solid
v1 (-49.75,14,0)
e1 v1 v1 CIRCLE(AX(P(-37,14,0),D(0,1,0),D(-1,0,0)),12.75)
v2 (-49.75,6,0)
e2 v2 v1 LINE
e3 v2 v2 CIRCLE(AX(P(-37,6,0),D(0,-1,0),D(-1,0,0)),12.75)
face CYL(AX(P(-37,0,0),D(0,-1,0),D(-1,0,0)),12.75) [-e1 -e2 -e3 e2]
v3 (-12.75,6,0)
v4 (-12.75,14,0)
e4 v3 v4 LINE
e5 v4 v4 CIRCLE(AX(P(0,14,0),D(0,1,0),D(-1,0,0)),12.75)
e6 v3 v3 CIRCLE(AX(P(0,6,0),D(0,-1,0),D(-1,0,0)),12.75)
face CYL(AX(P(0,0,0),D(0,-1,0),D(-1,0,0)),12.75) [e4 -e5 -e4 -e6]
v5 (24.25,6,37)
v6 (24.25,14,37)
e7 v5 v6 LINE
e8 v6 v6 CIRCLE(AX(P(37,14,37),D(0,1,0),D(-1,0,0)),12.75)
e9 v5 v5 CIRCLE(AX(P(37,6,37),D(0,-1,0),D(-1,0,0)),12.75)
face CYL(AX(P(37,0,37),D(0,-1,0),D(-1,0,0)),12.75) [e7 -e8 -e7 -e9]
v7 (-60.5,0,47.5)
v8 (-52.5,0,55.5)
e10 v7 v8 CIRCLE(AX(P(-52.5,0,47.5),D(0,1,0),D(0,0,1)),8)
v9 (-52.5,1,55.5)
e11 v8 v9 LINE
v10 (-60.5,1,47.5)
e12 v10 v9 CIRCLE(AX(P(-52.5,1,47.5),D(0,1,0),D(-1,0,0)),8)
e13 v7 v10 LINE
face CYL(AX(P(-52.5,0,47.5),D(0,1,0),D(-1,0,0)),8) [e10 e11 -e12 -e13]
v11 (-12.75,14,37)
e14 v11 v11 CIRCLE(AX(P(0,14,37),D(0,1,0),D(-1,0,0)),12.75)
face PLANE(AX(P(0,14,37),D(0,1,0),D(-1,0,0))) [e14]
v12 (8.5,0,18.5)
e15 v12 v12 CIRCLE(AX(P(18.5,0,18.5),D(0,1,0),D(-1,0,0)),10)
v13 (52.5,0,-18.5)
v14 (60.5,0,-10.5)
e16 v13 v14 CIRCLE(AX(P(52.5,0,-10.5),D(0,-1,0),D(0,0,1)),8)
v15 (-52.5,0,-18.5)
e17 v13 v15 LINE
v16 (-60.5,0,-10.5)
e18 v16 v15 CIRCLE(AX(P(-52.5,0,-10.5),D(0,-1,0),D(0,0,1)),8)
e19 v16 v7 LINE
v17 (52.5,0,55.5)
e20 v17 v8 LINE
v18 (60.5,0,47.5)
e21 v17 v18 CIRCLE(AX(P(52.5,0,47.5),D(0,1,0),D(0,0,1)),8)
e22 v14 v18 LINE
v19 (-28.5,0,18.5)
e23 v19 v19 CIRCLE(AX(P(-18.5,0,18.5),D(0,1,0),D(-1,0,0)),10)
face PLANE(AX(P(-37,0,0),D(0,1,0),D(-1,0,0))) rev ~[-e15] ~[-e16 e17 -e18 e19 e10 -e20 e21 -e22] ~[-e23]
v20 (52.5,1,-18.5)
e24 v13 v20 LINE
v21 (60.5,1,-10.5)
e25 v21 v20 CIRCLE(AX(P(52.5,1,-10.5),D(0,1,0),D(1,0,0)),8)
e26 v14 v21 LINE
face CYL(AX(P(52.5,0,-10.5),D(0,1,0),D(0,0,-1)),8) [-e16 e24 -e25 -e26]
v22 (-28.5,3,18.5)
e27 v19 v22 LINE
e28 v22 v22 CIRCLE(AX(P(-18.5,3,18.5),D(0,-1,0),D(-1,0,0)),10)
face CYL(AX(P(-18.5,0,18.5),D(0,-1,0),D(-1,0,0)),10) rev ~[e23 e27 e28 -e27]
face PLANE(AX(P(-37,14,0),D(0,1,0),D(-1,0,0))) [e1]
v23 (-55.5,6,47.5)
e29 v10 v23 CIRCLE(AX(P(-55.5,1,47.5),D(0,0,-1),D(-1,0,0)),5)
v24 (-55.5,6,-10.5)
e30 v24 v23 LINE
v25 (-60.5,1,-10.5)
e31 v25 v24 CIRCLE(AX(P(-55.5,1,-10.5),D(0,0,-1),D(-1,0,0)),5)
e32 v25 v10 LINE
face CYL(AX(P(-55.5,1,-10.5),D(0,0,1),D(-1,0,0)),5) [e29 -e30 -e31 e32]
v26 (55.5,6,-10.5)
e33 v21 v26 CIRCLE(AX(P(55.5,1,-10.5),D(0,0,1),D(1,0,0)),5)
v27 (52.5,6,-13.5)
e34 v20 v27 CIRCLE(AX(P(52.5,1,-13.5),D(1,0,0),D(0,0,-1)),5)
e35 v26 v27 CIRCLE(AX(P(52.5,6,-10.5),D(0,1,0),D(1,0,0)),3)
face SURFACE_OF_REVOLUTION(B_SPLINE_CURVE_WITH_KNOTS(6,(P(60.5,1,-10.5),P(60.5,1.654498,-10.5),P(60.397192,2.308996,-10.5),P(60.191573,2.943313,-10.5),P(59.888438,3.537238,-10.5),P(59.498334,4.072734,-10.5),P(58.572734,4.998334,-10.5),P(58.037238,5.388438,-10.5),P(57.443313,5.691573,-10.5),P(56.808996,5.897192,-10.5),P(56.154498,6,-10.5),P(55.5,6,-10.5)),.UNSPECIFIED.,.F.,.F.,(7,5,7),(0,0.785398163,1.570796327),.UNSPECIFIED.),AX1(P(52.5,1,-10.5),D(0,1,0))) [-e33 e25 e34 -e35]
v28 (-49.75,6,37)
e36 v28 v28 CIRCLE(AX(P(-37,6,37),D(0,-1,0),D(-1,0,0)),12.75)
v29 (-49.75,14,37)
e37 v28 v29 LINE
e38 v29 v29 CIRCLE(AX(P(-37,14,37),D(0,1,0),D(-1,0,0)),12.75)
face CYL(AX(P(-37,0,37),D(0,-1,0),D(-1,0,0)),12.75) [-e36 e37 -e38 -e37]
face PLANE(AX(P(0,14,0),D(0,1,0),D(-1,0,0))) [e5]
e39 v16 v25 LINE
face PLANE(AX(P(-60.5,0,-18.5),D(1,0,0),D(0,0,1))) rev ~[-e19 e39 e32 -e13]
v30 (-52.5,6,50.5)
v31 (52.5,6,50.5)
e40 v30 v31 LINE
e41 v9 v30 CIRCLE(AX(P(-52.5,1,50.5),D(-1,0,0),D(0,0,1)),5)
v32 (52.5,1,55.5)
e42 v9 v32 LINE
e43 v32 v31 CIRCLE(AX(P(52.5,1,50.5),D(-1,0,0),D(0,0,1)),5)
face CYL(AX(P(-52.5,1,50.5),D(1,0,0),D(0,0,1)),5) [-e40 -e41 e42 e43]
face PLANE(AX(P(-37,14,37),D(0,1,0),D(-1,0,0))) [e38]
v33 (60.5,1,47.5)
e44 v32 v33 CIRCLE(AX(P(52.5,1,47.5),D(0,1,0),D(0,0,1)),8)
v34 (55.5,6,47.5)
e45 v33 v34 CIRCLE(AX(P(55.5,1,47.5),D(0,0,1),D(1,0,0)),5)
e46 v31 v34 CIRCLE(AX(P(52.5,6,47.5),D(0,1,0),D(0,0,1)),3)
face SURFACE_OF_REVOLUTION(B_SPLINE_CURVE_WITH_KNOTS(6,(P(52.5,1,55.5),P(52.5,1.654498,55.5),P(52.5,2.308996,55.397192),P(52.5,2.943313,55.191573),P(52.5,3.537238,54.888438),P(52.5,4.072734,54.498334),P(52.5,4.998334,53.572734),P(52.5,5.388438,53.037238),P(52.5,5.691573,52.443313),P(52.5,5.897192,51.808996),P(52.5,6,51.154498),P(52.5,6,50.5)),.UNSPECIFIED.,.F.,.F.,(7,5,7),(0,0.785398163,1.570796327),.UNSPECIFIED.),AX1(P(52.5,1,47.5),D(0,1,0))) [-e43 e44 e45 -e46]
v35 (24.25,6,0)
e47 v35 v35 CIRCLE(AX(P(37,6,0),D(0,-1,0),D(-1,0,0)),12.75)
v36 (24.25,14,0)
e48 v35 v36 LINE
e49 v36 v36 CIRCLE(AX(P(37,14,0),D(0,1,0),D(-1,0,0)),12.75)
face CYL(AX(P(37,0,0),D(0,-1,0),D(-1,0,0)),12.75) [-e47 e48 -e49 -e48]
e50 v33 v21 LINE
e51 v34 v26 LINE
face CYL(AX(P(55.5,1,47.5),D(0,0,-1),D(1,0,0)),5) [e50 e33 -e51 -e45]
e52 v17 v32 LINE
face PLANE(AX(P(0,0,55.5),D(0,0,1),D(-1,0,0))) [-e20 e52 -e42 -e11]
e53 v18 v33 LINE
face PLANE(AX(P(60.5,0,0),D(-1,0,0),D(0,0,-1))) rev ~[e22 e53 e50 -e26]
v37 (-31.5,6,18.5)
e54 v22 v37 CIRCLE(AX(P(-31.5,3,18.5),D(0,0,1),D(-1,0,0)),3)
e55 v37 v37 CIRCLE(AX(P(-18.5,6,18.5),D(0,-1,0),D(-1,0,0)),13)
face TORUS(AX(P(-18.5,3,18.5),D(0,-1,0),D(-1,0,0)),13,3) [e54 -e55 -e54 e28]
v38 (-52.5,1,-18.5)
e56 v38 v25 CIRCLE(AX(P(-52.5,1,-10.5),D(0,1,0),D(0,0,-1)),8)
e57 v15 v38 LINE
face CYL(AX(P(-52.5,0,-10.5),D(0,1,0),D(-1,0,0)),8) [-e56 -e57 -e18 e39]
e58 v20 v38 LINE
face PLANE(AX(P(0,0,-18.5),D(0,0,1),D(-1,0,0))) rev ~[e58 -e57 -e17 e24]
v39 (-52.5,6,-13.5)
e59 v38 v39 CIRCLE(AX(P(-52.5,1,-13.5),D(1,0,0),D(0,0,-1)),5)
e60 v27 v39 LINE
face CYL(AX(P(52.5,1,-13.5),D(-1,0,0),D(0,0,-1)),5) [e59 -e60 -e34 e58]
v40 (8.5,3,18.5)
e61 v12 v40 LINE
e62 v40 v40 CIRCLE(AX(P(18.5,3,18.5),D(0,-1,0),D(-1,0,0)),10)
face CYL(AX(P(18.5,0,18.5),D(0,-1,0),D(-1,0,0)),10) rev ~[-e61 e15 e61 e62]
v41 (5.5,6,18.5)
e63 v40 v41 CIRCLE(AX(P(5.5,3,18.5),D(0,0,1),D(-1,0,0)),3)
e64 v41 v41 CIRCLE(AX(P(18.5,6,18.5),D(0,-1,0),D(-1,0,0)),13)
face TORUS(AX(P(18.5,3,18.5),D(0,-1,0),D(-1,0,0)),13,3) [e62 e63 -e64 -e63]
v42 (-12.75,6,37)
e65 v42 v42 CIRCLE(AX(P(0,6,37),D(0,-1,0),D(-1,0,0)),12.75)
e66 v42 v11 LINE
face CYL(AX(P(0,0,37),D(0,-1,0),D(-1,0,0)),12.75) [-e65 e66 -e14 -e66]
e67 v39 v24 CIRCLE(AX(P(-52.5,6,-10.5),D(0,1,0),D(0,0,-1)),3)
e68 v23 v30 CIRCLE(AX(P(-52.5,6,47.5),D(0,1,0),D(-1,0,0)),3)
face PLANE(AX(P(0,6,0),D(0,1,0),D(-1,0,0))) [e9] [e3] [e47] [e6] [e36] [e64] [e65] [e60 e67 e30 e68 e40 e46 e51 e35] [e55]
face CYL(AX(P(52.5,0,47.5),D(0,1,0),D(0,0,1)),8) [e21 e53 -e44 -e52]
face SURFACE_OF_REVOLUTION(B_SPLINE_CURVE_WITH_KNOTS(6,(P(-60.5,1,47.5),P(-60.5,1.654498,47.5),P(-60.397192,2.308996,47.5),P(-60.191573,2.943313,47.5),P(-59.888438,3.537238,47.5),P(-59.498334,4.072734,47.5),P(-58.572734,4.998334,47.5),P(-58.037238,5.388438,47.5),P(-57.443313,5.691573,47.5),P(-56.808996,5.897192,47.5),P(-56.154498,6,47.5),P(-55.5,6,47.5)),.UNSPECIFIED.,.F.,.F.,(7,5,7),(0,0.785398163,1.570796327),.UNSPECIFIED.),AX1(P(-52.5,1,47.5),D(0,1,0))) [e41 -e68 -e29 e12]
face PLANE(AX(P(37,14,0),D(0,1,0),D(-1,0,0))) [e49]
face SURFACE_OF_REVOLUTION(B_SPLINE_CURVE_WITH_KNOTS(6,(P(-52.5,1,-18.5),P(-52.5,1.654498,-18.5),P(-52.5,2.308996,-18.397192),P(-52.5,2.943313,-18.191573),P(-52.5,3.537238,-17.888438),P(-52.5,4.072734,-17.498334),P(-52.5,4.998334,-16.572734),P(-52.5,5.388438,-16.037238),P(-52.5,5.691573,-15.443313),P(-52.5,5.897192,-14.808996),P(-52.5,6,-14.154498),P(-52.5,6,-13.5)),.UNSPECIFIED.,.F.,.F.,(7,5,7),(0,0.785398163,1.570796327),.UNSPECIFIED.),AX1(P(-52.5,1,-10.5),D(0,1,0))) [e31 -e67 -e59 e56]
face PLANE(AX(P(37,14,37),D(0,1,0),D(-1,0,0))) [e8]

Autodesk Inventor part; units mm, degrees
ref_plane "YZ Plane" through (0, 0, 0) normal (1, 0, 0) x (0, 1, 0)
ref_plane "XZ Plane" through (0, 0, 0) normal (0, 1, 0) x (-1, 0, 0)
ref_plane "XY Plane" through (0, 0, 0) normal (0, 0, 1) x (1, 0, 0)
sketch "Sketch1" plane through (0, 0, 0) normal (0, 1, 0) x (-1, 0, 0)
  line L0 (25.9, 0) -> (-25.9, 0) projected
  line L1 (0, -25.9) -> (0, 25.9) projected
  circle A0 centre (0, 0) radius 18.5 construction
  circle A1 centre (0, 0) radius 13 construction
  dimension "d0" = 37
  dimension "d1" = 26
sketch "Sketch2" plane through (0, 0, 0) normal (0, 1, 0) x (-1, 0, 0)
  line L0 (84.7, 0) -> (-84.7, 0) projected
  line L1 (0, -33.3) -> (0, 70.3) projected
  line L2 (-60.5, 55.5) -> (-60.5, -18.5)
  line L3 (-60.5, -18.5) -> (60.5, -18.5)
  line L4 (60.5, -18.5) -> (60.5, 55.5)
  line L5 (-60.5, 55.5) -> (60.5, 55.5)
  circle A0 centre (0, 37) radius 18.5 construction
  point P0 (0, 0)
  dimension "d3" = 121
  dimension "d29" = 18.5
  dimension "d30" = 55.5
  dimension "d99" = 37
  dimension "d100" = 37
extrude "Extrusion1" add sketch "Sketch2" along normal blind 6
sketch "Sketch6" plane through (0, 0, 0) normal (0, 1, 0) x (-1, 0, 0)
  line L0 (60.5, -18.5) -> (-60.5, -18.5) projected
  line L1 (60.5, 55.5) -> (60.5, -18.5) projected
  line L2 (-60.5, -18.5) -> (60.5, -18.5)
  line L3 (60.5, -18.5) -> (60.5, 55.5)
  line L4 (-60.5, 55.5) -> (-60.5, -18.5)
  line L5 (84.7, 0) -> (-84.7, 0) projected
  line L6 (0, -36.3) -> (0, 70.8) projected
  arc A0 (-16, 0) -> (16, 0) centre (0, 0) ccw
  line L7 (16, 0) -> (16, 55.5)
  line L8 (60.5, 55.5) -> (-60.5, 55.5) projected
  line L9 (16, 55.5) -> (60.5, 55.5)
  line L10 (-16, 0) -> (-16, 55.5)
  line L11 (-16, 55.5) -> (-60.5, 55.5)
  point P0 (-17.3617, -21)
  dimension "d18" = 32
extrude "Extrusion5" [suppressed]
sketch "Sketch4" plane through (0, 0, 0) normal (0, 0, 1) x (1, 0, 0)
  line L0 (-18.5, 0) -> (18.5, 0)
  line L1 (18.5, 0) -> (18.5, -2)
  line L2 (18.5, -2) -> (-18.5, -2)
  line L3 (-18.5, -2) -> (-18.5, 0)
  line L4 (-25.9, 0) -> (25.9, 0) projected
  line L5 (0, -2.4) -> (0, 0.4) projected
  point P0 (0, 0)
  dimension "d10" = 37
  dimension "d11" = 2
extrude "Extrusion6" [suppressed]
sketch "Sketch5" plane through (0, 0, 0) normal (0, 1, 0) x (-1, 0, 0)
  circle A0 centre (0, 0) radius 18.5 construction
  circle A1 centre (0, 0) radius 18.5 construction
  line L0 (25.9, 0) -> (-25.9, 0) projected
  line L1 (0, -28.9) -> (0, 26.4) projected
  line L2 (-18.5, -21) -> (18.5, -21)
  line L3 (18.5, -21) -> (18.5, -18.5)
  line L4 (18.5, -18.5) -> (-18.5, -18.5)
  line L5 (-18.5, -18.5) -> (-18.5, -21)
  dimension "d25" = 37
  dimension "d26" = 21
extrude "Extrusion7" [suppressed]
sketch "Sketch7" plane through (0, 0, 0) normal (0, 0, 1) x (1, 0, 0)
  line L0 (-18.5, 0) -> (18.5, 0)
  line L1 (18.5, 0) -> (18.5, -2)
  line L2 (18.5, -2) -> (-18.5, -2)
  line L3 (-18.5, -2) -> (-18.5, 0)
  line L4 (60.5, 0) -> (-60.5, 0) projected
  line L5 (-84.7, 0) -> (84.7, 0) projected
  line L6 (0, -2.4) -> (0, 0.4) projected
  point P0 (-16, 0)
  point P1 (16, 0)
  dimension "d53" = 2
  dimension "d54" = 18.5
extrude "Extrusion8" [suppressed]
sketch "Sketch8" plane through (0, 0, 0) normal (0, 1, 0) x (-1, 0, 0)
  circle A0 centre (0, 0) radius 12.75
  dimension "d34" = 25.5
extrude "Extrusion9" add sketch "Sketch8" along normal blind 14
pattern_linear "Rectangular Pattern1" count 2 spacing 37 along (0, 0, 1) count 3 spacing 37 along (1, 0, 0) of "Extrusion9" second direction both ways yes
sketch "Sketch9" plane through (0, 6, 0) normal (0, 1, 0) x (1, 0, 0)
  circle A0 centre (0, 0) radius 13
  circle A1 centre (0, 0) radius 15
  dimension "d40" = 26
  dimension "d41" = 30
extrude "Extrusion10" [suppressed]
sketch "Sketch10" plane through (0, 5, 0) normal (0, 1, 0) x (1, 0, 0)
  arc A0 (16, 0) -> (-16, 0) centre (0, 0) ccw projected
  line L0 (1.5, -18) -> (-1.5, -18)
  line L1 (-29.4, 0) -> (29.4, 0) projected
  line L2 (0, 36.3) -> (0, -70.8) projected
  line L3 (1.5, -12) -> (-1.5, -12)
  line L4 (1.5, -12) -> (1.5, -18)
  line L5 (-1.5, -18) -> (-1.5, -12)
  dimension "d48" = 3
  dimension "d49" = 12
  dimension "d50" = 6
extrude "Extrusion11" [suppressed]
fillet "Fillet1" [suppressed]
sketch "Sketch11" plane through (0, 0, 0) normal (0, 1, 0) x (-1, 0, 0)
  line L0 (-60.5, -21) -> (60.5, -21)
  line L1 (60.5, -21) -> (60.5, -47)
  line L2 (60.5, -47) -> (-60.5, -47)
  line L3 (-60.5, -47) -> (-60.5, -21)
  line L4 (84.7, 0) -> (-84.7, 0) projected
  line L5 (0, -60.1) -> (0, 31.6) projected
  point P0 (0, 0)
  dimension "d57" = 26
  dimension "d58" = 21
  dimension "d59" = 121
extrude "Extrusion12" [suppressed]
sketch "Sketch12" plane through (0, 0, 0) normal (1, 0, 0) x (0, 1, 0)
  line L0 (6, 55.5) -> (6, -18.5) projected
  arc A0 (6, -16.5081) -> (5.7334, -47) centre (34, -32) ccw
  line L1 (-6.8, 0) -> (40.8, 0) projected
  line L2 (0, -67.5) -> (0, 76) projected
  line L3 (6, -16.5081) -> (6, -47)
  line L4 (6, -47) -> (5.7334, -47)
  line L5 (0, -47) -> (6, -47) projected
  point P0 (0, 0)
  point P1 (6, 48)
  dimension "d62" = 32
  dimension "d63" = 32
  dimension "d64" = 34
extrude "Extrusion13" [suppressed]
fillet "Fillet3" [suppressed]
sketch "Sketch13" plane through (0, 0, 0) normal (0, 1, 0) x (-1, 0, 0)
  line L0 (84.7, 0) -> (-84.7, 0) projected
  line L1 (0, -67.5) -> (0, 76) projected
  line L2 (60.5, 55.5) -> (60.5, -18.5) projected
  arc A0 (13.0815, 23.9185) -> (13.0815, 13.0815) centre (18.5, 18.5) ccw
  line L3 (-60.5, 55.5) -> (-60.5, -18.5) projected
  arc A1 (-13.0815, 13.0815) -> (-13.0815, 23.9185) centre (-18.5, 18.5) ccw
  line L4 (18.5, 37) -> (18.5, 0)
  line L5 (-18.5, 0) -> (-18.5, 37)
  line L6 (18.5, 37) -> (18.5, 55.5)
  line L7 (-60.5, 55.5) -> (60.5, 55.5) projected
  line L8 (-18.5, 55.5) -> (-18.5, 37)
  arc A2 (-9.2871, 53) -> (-13.0815, 23.9185) centre (0, 37) ccw
  arc A3 (13.0815, 23.9185) -> (9.2871, 53) centre (0, 37) ccw
  arc A4 (-13.0815, 13.0815) -> (-18.5, 0) centre (0, 0) ccw
  arc A5 (18.5, 0) -> (13.0815, 13.0815) centre (0, 0) ccw
  point P0 (60.5, -39.254)
  point P1 (-55.5, 48)
  point P2 (-60.5, -16.5081)
  point P3 (-60.5, -47)
  point P4 (60.5, -18.5)
  point P5 (-60.5, -18.5)
  dimension "d68" = 37
  dimension "d71" = 18.5
  dimension "d72" = 18.5
  dimension "d73" = 7.663
  dimension "d74" = 7.663
  dimension "d75" = 18.5
  dimension "d76" = 18.5
  dimension "d77" = 18.5
  dimension "d78" = 18.5
extrude "Extrusion14" [suppressed]
sketch "Sketch14" plane through (0, 0, 0) normal (0, 1, 0) x (-1, 0, 0)
  circle A0 centre (18.5, 18.5) radius 10
  line L0 (39.9, 0) -> (-39.9, 0) projected
  line L1 (0, -27.9) -> (0, 37.9) projected
  circle A1 centre (-18.5, 18.5) radius 10
  point P0 (0, 0)
  dimension "d84" = 18.5
  dimension "d85" = 18.5
  dimension "d86" = 20
  dimension "d89" = 37
extrude "Extrusion15" cut sketch "Sketch14" along normal through all
fillet "Fillet4" radius 3 2 edges at (-8.5, 6, 18.5) (28.5, 6, 18.5)
fillet "Fillet5" radius 8 4 edges at (-60.5, 3, 55.5) (60.5, 3, 55.5) (-60.5, 3, -18.5) (60.5, 3, -18.5)
fillet "Fillet6" radius 5 5 edges at (58.1569, 6, 53.1569) (60.5, 6, 18.5) (-58.1569, 6, 53.1569) (-60.5, 6, 18.5) (0, 6, 55.5)
equation "\"d85\" = d84"
properties part number "NespressoSpeedfiller-6X-tamper"
